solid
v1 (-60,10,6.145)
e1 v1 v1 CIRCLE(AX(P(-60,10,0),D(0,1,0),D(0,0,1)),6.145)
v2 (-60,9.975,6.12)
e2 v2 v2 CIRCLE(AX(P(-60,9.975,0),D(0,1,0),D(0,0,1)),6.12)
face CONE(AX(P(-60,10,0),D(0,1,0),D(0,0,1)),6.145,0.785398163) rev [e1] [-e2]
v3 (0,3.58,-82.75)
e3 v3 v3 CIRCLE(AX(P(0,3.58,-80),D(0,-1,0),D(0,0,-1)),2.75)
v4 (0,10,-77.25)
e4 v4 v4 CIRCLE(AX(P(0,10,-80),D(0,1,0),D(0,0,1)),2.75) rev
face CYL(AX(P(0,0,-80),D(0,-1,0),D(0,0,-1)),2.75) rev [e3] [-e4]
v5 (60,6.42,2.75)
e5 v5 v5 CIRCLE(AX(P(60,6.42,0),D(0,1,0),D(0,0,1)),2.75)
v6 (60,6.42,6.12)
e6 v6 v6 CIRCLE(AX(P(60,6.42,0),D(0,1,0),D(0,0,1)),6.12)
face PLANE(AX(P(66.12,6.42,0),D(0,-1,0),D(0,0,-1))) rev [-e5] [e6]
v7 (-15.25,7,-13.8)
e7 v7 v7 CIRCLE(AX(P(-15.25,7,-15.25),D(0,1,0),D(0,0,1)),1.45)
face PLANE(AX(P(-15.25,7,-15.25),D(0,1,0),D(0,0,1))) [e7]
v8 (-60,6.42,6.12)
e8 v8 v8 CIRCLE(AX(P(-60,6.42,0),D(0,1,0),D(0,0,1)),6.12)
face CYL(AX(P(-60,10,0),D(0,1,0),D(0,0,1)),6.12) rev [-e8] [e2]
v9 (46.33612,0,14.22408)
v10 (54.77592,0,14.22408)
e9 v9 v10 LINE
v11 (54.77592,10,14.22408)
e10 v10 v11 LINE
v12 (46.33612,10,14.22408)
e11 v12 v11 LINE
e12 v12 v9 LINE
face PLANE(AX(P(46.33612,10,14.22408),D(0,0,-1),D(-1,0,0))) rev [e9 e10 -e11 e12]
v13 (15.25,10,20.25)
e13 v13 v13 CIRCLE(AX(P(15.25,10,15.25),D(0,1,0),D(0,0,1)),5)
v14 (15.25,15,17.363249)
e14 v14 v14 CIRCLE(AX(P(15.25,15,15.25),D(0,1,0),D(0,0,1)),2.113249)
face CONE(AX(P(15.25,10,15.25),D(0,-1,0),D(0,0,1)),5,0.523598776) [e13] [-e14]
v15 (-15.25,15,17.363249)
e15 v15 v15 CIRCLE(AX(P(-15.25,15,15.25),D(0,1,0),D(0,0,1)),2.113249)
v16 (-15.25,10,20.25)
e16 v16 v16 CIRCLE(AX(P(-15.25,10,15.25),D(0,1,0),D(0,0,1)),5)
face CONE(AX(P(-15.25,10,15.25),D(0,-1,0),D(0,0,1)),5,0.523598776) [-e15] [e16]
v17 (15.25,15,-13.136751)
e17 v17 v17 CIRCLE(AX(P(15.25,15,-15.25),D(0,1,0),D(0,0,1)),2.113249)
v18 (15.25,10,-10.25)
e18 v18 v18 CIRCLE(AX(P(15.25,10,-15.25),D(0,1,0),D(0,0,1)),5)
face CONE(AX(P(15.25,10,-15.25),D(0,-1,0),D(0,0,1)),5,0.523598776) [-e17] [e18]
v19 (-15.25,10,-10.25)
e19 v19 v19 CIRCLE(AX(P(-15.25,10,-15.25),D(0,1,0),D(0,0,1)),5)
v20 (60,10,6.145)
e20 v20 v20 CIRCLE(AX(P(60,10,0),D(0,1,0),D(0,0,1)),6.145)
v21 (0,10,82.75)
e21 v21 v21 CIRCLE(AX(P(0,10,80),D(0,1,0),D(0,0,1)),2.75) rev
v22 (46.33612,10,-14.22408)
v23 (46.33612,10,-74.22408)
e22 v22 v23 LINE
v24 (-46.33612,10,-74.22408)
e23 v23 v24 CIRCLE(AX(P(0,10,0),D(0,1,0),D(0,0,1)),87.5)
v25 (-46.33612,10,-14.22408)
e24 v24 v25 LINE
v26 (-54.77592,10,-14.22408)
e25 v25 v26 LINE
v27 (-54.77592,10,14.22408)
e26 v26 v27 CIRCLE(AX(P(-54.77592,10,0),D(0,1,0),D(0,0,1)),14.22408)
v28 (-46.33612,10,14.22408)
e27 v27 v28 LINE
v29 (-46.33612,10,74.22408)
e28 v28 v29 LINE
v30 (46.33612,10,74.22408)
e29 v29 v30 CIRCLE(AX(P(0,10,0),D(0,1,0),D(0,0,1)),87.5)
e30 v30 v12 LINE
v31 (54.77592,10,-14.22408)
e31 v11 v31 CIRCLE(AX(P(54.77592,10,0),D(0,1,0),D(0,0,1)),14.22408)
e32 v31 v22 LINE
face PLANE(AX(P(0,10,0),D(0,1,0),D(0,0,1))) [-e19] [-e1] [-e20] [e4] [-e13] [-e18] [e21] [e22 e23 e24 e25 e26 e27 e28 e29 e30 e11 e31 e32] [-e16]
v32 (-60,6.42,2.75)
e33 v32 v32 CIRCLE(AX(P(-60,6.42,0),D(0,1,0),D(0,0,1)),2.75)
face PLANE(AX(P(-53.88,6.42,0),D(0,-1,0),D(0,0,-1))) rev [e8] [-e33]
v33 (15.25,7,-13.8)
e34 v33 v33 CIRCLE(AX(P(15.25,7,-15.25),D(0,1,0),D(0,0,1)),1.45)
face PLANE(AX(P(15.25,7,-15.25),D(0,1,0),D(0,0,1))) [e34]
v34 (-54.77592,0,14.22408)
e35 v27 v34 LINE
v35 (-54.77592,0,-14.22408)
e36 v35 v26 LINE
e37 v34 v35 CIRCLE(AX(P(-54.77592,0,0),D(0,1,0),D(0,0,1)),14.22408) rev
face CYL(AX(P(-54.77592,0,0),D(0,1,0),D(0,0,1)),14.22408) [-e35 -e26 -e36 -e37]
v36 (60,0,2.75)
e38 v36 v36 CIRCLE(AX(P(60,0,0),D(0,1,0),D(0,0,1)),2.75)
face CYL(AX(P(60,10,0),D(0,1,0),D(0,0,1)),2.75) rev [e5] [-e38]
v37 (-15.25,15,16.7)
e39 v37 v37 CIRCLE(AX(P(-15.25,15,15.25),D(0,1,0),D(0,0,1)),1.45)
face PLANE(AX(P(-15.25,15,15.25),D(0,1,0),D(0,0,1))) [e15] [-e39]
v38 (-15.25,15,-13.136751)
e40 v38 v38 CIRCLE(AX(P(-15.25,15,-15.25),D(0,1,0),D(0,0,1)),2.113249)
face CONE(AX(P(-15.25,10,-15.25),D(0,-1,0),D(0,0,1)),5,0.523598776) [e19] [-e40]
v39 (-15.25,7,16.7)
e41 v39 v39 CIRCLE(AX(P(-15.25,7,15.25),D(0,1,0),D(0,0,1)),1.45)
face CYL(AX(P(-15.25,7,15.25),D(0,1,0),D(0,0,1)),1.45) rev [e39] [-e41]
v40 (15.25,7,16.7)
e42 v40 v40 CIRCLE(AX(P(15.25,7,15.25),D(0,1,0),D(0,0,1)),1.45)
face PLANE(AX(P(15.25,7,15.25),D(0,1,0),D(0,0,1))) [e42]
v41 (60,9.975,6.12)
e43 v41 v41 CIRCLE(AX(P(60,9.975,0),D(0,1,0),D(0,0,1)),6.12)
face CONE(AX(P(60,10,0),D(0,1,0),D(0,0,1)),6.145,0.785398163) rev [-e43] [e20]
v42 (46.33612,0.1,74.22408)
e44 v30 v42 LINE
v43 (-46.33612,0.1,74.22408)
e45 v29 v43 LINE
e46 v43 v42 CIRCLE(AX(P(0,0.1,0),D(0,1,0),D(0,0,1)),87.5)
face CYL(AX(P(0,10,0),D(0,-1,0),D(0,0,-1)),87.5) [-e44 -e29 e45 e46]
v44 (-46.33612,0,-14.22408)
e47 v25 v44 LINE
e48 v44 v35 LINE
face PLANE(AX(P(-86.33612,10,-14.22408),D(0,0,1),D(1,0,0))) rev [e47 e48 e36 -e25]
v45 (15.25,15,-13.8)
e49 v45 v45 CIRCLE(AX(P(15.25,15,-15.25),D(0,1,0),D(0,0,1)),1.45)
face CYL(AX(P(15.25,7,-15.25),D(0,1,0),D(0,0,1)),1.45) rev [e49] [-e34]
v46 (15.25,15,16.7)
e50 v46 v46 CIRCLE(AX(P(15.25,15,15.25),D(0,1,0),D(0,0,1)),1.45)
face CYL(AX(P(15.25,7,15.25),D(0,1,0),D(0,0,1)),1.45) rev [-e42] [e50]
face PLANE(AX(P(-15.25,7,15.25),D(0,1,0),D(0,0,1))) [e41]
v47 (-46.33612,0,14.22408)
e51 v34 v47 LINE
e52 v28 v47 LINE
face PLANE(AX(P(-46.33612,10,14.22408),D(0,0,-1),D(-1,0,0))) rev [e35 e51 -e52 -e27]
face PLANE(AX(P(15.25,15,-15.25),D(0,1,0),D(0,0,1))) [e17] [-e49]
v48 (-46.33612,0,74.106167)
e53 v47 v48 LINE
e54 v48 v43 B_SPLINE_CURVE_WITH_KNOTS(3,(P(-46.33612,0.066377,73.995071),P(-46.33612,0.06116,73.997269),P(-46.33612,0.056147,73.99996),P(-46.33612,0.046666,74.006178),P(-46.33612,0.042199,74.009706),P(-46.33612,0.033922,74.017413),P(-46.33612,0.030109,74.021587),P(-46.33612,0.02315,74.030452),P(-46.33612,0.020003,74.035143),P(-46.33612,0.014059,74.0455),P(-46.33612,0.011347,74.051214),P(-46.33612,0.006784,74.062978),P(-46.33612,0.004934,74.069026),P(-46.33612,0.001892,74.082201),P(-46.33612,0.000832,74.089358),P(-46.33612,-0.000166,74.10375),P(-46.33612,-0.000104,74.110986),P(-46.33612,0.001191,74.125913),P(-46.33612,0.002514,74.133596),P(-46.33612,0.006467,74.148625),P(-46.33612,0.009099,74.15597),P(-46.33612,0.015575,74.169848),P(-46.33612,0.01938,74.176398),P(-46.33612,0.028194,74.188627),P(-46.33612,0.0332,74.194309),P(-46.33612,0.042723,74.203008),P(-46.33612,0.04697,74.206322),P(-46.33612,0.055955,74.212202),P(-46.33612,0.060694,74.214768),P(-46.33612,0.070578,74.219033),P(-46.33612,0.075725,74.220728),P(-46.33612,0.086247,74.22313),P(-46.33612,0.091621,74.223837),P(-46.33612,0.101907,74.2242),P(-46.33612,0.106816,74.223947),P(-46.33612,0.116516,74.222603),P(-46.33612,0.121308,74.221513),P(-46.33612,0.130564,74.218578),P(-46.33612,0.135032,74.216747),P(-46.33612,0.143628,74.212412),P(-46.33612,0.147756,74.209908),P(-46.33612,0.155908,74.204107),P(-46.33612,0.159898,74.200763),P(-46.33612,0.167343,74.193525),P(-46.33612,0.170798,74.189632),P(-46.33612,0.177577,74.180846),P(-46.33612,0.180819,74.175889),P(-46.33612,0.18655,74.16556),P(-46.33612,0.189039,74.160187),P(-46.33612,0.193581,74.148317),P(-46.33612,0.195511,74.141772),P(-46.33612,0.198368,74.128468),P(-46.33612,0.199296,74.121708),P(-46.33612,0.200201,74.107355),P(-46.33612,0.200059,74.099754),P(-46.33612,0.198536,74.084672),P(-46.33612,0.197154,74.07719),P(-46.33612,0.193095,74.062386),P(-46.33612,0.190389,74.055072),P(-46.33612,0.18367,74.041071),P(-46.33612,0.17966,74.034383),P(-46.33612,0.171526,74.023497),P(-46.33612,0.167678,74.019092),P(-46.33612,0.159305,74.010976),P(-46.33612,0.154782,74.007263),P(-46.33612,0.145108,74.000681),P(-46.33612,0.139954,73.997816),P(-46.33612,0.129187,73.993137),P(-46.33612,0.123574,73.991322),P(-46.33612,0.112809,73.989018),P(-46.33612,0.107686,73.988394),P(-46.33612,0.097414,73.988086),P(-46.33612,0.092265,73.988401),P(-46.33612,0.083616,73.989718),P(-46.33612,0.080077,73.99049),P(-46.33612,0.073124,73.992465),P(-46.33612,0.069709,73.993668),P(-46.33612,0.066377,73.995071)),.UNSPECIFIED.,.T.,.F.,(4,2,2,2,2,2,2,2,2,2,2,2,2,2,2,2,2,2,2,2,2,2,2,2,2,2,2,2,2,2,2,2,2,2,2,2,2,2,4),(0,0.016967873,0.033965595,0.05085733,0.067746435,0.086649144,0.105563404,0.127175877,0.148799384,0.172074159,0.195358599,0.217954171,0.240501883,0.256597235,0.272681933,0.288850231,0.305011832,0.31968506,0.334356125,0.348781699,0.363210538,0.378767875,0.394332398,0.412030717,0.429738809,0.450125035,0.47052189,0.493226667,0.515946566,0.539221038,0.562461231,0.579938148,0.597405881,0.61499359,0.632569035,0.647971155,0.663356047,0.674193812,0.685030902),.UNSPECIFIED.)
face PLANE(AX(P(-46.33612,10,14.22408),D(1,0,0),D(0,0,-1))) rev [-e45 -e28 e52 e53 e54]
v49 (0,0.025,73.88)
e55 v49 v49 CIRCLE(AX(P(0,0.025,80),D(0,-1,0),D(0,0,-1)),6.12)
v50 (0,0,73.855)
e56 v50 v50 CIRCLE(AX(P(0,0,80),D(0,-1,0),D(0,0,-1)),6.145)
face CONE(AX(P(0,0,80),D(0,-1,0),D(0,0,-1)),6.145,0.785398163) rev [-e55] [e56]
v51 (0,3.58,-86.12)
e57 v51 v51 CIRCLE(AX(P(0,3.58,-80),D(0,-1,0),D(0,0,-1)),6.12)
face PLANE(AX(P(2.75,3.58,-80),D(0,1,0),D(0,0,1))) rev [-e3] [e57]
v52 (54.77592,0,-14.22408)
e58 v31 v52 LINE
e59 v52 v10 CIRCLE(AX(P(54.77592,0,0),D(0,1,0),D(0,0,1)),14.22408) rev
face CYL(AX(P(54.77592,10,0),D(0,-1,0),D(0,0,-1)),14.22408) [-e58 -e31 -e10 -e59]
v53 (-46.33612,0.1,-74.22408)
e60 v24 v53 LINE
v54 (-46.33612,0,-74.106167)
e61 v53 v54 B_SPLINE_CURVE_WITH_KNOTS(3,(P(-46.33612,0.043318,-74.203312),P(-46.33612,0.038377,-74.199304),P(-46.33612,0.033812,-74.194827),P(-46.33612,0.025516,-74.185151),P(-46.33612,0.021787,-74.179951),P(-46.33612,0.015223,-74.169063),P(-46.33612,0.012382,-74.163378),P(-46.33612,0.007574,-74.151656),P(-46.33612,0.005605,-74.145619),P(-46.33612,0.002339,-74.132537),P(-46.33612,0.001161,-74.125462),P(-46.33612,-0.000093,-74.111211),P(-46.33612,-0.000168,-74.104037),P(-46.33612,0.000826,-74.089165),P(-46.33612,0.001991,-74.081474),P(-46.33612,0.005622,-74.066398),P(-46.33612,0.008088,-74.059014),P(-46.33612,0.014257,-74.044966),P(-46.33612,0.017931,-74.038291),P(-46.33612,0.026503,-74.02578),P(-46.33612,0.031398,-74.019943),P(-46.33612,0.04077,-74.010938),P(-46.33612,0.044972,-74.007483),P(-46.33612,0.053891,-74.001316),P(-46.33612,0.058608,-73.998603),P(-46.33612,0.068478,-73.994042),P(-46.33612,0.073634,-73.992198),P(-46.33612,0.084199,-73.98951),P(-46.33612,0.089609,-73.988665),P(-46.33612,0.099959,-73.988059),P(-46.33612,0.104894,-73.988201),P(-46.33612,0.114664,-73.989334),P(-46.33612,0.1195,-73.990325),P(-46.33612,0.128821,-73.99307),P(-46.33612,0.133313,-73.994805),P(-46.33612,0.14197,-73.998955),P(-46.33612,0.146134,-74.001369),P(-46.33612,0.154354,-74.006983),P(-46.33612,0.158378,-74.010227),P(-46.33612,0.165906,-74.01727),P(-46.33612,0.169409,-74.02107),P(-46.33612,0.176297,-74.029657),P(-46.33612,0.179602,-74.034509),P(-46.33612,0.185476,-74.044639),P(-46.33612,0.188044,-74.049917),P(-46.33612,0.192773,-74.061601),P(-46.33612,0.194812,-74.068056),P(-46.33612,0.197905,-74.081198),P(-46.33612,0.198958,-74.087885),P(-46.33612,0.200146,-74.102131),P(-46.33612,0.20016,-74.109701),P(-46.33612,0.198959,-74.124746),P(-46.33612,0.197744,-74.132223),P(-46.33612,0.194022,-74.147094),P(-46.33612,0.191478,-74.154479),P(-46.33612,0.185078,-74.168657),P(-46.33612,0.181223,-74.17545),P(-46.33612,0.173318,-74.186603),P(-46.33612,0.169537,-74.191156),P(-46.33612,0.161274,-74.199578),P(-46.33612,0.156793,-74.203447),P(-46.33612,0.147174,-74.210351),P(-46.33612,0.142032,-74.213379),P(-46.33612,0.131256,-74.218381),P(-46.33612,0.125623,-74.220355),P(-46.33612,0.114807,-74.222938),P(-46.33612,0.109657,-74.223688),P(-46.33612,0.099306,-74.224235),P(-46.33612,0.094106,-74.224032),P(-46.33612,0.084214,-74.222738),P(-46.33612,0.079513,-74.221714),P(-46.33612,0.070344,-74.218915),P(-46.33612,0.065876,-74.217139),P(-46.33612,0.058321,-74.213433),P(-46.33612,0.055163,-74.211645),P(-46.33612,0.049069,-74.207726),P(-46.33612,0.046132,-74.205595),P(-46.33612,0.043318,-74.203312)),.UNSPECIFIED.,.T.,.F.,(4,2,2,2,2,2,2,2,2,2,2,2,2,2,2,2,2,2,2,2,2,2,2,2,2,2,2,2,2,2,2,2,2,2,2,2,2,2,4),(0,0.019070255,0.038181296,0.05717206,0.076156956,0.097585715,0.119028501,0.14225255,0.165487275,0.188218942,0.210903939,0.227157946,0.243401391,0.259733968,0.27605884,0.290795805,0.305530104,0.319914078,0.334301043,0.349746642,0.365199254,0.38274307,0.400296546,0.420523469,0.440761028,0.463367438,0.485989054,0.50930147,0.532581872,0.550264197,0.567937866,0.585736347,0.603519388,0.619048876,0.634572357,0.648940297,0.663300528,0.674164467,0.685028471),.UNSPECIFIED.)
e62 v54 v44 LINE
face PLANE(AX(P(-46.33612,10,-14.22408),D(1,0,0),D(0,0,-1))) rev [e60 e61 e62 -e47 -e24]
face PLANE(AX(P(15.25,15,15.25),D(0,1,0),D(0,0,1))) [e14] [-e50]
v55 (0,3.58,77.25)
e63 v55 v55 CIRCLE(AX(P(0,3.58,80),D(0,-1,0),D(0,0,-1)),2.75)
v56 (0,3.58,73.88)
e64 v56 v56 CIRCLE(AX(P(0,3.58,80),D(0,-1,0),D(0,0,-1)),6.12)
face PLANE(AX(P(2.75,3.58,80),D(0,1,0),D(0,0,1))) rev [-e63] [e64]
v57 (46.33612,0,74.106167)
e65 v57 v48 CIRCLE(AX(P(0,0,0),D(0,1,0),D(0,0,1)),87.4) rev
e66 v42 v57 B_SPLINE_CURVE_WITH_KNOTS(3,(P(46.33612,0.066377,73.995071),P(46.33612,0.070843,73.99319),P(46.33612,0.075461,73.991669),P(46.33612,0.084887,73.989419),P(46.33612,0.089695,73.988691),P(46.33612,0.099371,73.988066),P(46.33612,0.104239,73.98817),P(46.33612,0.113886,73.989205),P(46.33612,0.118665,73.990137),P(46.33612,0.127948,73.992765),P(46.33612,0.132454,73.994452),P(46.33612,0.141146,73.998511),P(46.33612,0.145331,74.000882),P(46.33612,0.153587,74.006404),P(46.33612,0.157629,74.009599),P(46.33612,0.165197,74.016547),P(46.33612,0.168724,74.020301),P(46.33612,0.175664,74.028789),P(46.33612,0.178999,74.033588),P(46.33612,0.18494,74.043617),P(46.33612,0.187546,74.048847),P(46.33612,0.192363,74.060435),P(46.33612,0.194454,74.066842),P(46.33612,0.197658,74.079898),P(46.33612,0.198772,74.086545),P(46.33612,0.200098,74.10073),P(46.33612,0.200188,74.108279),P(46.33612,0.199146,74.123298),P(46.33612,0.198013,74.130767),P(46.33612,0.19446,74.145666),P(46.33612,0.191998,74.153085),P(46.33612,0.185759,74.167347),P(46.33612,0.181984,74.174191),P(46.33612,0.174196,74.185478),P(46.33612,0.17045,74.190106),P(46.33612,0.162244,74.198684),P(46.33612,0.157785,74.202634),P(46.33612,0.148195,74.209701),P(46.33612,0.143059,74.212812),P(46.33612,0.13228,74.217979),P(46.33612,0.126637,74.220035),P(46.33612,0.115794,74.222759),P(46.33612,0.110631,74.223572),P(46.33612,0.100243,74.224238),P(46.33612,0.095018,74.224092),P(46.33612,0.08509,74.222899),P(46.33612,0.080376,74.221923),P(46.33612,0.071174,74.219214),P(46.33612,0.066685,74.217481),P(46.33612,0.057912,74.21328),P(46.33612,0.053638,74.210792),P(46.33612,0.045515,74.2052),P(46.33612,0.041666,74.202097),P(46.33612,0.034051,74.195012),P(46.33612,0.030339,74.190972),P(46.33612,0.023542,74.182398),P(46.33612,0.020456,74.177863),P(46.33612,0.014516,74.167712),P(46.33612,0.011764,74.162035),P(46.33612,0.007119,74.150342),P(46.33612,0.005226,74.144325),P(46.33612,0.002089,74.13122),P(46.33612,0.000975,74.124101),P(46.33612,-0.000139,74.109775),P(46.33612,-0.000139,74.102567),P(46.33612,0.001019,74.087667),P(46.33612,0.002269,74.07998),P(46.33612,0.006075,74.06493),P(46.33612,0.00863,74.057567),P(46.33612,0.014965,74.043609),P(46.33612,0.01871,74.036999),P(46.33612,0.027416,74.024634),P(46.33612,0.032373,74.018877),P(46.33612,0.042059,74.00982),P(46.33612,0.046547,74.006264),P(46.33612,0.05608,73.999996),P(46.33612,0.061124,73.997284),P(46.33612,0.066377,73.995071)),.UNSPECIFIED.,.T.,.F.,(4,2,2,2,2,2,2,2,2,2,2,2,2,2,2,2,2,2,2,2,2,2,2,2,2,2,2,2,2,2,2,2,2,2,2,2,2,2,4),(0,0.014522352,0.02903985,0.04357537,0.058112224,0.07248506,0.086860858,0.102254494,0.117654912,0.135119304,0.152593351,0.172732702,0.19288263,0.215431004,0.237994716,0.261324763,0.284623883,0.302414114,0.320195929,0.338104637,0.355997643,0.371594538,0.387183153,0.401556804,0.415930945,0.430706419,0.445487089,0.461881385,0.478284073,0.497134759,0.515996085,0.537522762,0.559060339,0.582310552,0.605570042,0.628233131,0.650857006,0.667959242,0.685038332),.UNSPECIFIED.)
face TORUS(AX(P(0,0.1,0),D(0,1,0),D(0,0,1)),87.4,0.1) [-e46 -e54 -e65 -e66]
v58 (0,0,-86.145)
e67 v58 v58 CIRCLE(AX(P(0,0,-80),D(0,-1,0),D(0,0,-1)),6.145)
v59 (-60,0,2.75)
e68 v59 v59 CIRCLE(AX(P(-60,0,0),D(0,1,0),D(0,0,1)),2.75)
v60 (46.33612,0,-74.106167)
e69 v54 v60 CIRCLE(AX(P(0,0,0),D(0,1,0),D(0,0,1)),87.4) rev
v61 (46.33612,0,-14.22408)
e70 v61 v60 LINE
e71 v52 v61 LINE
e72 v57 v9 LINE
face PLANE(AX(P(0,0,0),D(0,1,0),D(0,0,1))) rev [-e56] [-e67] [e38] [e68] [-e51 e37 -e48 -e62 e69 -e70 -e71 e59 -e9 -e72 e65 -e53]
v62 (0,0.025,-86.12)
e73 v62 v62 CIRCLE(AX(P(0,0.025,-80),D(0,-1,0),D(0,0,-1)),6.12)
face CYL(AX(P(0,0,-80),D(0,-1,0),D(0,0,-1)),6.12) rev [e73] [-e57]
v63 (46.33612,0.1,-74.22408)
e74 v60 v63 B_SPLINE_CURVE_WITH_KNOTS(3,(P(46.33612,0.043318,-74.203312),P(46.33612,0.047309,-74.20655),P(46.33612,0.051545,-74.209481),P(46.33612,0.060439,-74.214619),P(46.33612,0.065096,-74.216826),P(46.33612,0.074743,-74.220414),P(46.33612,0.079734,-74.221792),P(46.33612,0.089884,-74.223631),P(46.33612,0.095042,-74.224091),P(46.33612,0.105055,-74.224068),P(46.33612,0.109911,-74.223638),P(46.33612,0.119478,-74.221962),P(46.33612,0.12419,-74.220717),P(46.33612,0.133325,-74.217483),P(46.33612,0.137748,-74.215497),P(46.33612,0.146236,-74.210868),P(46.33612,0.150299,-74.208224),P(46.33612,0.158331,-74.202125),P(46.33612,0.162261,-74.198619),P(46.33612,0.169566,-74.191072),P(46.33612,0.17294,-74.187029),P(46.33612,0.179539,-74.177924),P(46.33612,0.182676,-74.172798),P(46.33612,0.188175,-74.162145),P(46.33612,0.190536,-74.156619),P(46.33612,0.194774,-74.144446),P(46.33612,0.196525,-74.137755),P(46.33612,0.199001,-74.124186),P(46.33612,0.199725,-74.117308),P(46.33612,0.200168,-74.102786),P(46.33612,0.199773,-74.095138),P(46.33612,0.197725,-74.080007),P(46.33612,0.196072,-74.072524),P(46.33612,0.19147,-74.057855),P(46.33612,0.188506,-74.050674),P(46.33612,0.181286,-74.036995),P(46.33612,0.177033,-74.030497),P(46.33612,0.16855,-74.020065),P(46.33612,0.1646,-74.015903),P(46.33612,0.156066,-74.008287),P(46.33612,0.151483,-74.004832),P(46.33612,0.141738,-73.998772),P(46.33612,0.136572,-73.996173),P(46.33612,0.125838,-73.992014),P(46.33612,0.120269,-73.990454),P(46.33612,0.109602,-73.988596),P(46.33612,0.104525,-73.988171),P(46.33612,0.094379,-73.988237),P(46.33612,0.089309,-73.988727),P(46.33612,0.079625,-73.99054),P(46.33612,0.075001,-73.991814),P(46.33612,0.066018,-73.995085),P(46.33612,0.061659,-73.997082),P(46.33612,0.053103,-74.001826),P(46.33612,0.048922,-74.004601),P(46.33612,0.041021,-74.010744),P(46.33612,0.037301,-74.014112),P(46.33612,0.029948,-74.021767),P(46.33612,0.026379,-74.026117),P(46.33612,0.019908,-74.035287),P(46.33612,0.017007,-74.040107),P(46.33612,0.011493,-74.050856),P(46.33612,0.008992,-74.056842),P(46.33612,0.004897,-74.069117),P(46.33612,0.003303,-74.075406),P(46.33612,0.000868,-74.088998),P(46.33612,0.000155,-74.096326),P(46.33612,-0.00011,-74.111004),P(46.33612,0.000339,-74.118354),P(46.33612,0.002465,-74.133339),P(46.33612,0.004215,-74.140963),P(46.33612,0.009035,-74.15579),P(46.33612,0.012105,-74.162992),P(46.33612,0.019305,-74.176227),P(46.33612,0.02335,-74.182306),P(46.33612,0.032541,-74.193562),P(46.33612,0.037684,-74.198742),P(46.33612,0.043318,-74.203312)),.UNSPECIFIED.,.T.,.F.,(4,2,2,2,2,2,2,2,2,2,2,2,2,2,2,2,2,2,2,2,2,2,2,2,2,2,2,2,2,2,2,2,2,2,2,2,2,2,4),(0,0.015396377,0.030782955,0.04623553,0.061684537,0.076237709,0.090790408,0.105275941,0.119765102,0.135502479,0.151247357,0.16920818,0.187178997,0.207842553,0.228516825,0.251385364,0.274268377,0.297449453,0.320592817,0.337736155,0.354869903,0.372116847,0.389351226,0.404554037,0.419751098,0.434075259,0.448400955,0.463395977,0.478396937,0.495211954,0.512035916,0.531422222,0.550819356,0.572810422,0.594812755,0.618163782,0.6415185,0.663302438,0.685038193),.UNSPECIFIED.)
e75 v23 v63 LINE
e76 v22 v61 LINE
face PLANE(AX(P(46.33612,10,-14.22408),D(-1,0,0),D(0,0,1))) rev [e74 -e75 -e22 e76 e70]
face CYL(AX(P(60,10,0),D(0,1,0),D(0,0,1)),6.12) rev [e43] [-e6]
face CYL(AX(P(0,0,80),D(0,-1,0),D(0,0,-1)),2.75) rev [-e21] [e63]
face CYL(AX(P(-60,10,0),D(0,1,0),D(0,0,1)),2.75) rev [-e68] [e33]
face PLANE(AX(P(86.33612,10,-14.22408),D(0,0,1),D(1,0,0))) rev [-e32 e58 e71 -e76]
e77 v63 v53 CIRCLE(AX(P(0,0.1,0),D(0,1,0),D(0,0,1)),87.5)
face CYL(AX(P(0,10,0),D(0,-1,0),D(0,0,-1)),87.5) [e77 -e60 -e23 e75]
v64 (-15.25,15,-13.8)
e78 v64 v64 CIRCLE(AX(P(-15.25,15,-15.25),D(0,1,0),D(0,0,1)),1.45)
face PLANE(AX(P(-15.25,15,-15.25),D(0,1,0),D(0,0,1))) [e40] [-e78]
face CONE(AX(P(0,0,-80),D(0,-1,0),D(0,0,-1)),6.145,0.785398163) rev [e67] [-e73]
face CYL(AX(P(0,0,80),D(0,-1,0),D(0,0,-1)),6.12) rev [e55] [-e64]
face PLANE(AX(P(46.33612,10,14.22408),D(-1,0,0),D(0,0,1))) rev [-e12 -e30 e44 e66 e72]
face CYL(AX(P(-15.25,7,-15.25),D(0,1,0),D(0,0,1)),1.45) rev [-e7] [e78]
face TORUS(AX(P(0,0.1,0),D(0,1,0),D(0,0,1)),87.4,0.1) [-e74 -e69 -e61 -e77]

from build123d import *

# Parameters (mm, degrees)
SKETCH1_R                              = 87.5
BOSS_EXTRUDE1_DEPTH                    = 10
SKETCH2_R                              = 7.5
BOSS_EXTRUDE2_DEPTH                    = 80
CBORE_FOR_M5_HEX_HEAD_BOLT1_AT_2_COUNT = 2
CBORE_FOR_M5_HEX_HEAD_BOLT1_AT_2_PITCH = 113.13708499
CBORE_FOR_M5_HEX_HEAD_BOLT1_AT_3_COUNT = 2
CBORE_FOR_M5_HEX_HEAD_BOLT1_AT_3_PITCH = 160
CBORE_FOR_M5_HEX_HEAD_BOLT1_AT_4_COUNT = 2
CBORE_FOR_M5_HEX_HEAD_BOLT1_AT_4_PITCH = 113.13708499
SKETCH5_R                              = 87.5
CUT_EXTRUDE1_DEPTH                     = 80
FILLET1_R                              = 0.1
SKETCH6_R                              = 5
BOSS_EXTRUDE3_DEPTH                    = 5
BOSS_EXTRUDE3_DRAFT                    = 30
BOSS_EXTRUDE3_PROFILE_2_DEPTH          = 5
BOSS_EXTRUDE3_PROFILE_2_DRAFT          = 30
BOSS_EXTRUDE3_PROFILE_3_DEPTH          = 5
BOSS_EXTRUDE3_PROFILE_3_DRAFT          = 30
BOSS_EXTRUDE3_PROFILE_4_DEPTH          = 5
BOSS_EXTRUDE3_PROFILE_4_DRAFT          = 30
SKETCH7_R                              = 1.45
CUT_EXTRUDE2_DEPTH                     = 8
CUT_EXTRUDE5_DEPTH                     = 10
CBORE_FOR_M5_HEX_HEAD_BOLT2_AT_2_COUNT = 2
CBORE_FOR_M5_HEX_HEAD_BOLT2_AT_2_PITCH = 120
SKETCH14_R                             = 2.75
CUT_EXTRUDE6_DEPTH                     = 70
FILLET2_RADIUS                         = 14.224079762
FILLET2_LENGTH                         = 10
FILLET3_RADIUS                         = 14.224079762
FILLET3_LENGTH                         = 10


with BuildPart() as part:
    # Sketch1 → Boss-Extrude1 (new body)
    with BuildSketch(Plane(origin=(0, 0, 0), x_dir=(1, 0, 0), z_dir=(0, 1, 0))):
        with Locations(Location((0, 0, 0), (0, 0, 270))):
            Circle(SKETCH1_R)
    extrude(amount=BOSS_EXTRUDE1_DEPTH)

    # Sketch2 → Boss-Extrude2 (add)
    with BuildSketch(Plane(origin=(0, 10, 0), x_dir=(1, 0, 0), z_dir=(0, 1, 0))):
        with Locations(Location((0, -80, 0), (0, 0, 269.999690569))):
            Circle(SKETCH2_R)
        with Locations(Location((-80, 0, 0), (0, 0, 179.999690555))):
            Circle(SKETCH2_R)
        with Locations(Location((0, 80, 0), (0, 0, 89.999690569))):
            Circle(SKETCH2_R)
        with Locations(Location((80, 0, 0), (0, 0, 359.999690555))):
            Circle(SKETCH2_R)
    extrude(amount=BOSS_EXTRUDE2_DEPTH)

    # Sketch4 → CBORE for M5 Hex Head Bolt1 (revolve, cut)
    with BuildSketch(Plane(origin=(80, 0, 0), x_dir=(0, 0, -1), z_dir=(1, 0, 0))):
        Polygon((0, 0), (0, 21.652366702), (2.75, 20), (2.75, 3.58), (6.12, 3.58), (6.12, 0.025), (6.145, 0), align=None)
    cbore_for_m5_hex_head_bolt1 = revolve(axis=Axis((80, -6.35, 0), (0, 1, 0)), mode=Mode.SUBTRACT)

    # CBORE for M5 Hex Head Bolt1 at 2: CBORE for M5 Hex Head Bolt1 ×2
    with Locations(*[Vector(-0.7071067811865476, 0, -0.7071067811865476) * (i * CBORE_FOR_M5_HEX_HEAD_BOLT1_AT_2_PITCH) for i in range(1, CBORE_FOR_M5_HEX_HEAD_BOLT1_AT_2_COUNT)]):
        add(cbore_for_m5_hex_head_bolt1, mode=Mode.SUBTRACT)

    # CBORE for M5 Hex Head Bolt1 at 3: CBORE for M5 Hex Head Bolt1 ×2
    with Locations(*[(-i * CBORE_FOR_M5_HEX_HEAD_BOLT1_AT_3_PITCH, 0, 0) for i in range(1, CBORE_FOR_M5_HEX_HEAD_BOLT1_AT_3_COUNT)]):
        add(cbore_for_m5_hex_head_bolt1, mode=Mode.SUBTRACT)

    # CBORE for M5 Hex Head Bolt1 at 4: CBORE for M5 Hex Head Bolt1 ×2
    with Locations(*[Vector(-0.7071067811865476, 0, 0.7071067811865476) * (i * CBORE_FOR_M5_HEX_HEAD_BOLT1_AT_4_PITCH) for i in range(1, CBORE_FOR_M5_HEX_HEAD_BOLT1_AT_4_COUNT)]):
        add(cbore_for_m5_hex_head_bolt1, mode=Mode.SUBTRACT)

    # Sketch5 → Cut-Extrude1 (cut)
    with BuildSketch(Plane(origin=(0, 10, 0), x_dir=(1, 0, 0), z_dir=(0, 1, 0))):
        with Locations(Location((0, 0, 0), (0, 0, 270))):
            Circle(SKETCH5_R)
    extrude(amount=CUT_EXTRUDE1_DEPTH, mode=Mode.SUBTRACT)


with BuildPart() as cut_extrude1_kept_piece:
    # of the separate pieces the step leaves, the one the design keeps (cut_extrude1_pieces_kept)
    add(part.part.solids().sort_by_distance((0, 0, 87.5))[0])

    # Fillet1
    fillet1_2_edges = [cut_extrude1_kept_piece.edges().sort_by_distance(p)[0] for p in [
        (0, 0, -87.5),
    ]]
    fillet(fillet1_2_edges, radius=FILLET1_R)


with BuildPart() as boss_extrude3_tool:
    # Sketch6 → Boss-Extrude3 (with draft: the straight prism first)
    with BuildSketch(Plane(origin=(0, 10, 0), x_dir=(1, 0, 0), z_dir=(0, 1, 0))):
        with Locations((-15.25, 15.25)):
            Circle(SKETCH6_R)
    extrude(amount=BOSS_EXTRUDE3_DEPTH)
    # Boss-Extrude3: the draft: its side faces are tilted about the plane it starts from
    boss_extrude3_sides = [boss_extrude3_tool.faces().sort_by_distance(p)[0] for p in [
        (-20.25, 12.5, -15.25),
    ]]
    draft(boss_extrude3_sides, Plane(origin=(0, 10, 0), x_dir=(1, 0, 0), z_dir=(0, 1, 0)), BOSS_EXTRUDE3_DRAFT)


with BuildPart() as cut_extrude1_kept_piece_1:
    add(cut_extrude1_kept_piece.part)

    # Boss-Extrude3: add boss_extrude3_tool
    add(boss_extrude3_tool.part)


with BuildPart() as boss_extrude3_profile_2_tool:
    # Sketch6 → Boss-Extrude3 profile 2 (with draft: the straight prism first)
    with BuildSketch(Plane(origin=(0, 10, 0), x_dir=(1, 0, 0), z_dir=(0, 1, 0))):
        with Locations((15.25, 15.25)):
            Circle(SKETCH6_R)
    extrude(amount=BOSS_EXTRUDE3_PROFILE_2_DEPTH)
    # Boss-Extrude3 profile 2: the draft: its side faces are tilted about the plane it starts from
    boss_extrude3_profile_2_sides = [boss_extrude3_profile_2_tool.faces().sort_by_distance(p)[0] for p in [
        (10.25, 12.5, -15.25),
    ]]
    draft(boss_extrude3_profile_2_sides, Plane(origin=(0, 10, 0), x_dir=(1, 0, 0), z_dir=(0, 1, 0)), BOSS_EXTRUDE3_PROFILE_2_DRAFT)


with BuildPart() as cut_extrude1_kept_piece_2:
    add(cut_extrude1_kept_piece_1.part)

    # Boss-Extrude3 profile 2: add boss_extrude3_profile_2_tool
    add(boss_extrude3_profile_2_tool.part)


with BuildPart() as boss_extrude3_profile_3_tool:
    # Sketch6 → Boss-Extrude3 profile 3 (with draft: the straight prism first)
    with BuildSketch(Plane(origin=(0, 10, 0), x_dir=(1, 0, 0), z_dir=(0, 1, 0))):
        with Locations((15.25, -15.25)):
            Circle(SKETCH6_R)
    extrude(amount=BOSS_EXTRUDE3_PROFILE_3_DEPTH)
    # Boss-Extrude3 profile 3: the draft: its side faces are tilted about the plane it starts from
    boss_extrude3_profile_3_sides = [boss_extrude3_profile_3_tool.faces().sort_by_distance(p)[0] for p in [
        (10.25, 12.5, 15.25),
    ]]
    draft(boss_extrude3_profile_3_sides, Plane(origin=(0, 10, 0), x_dir=(1, 0, 0), z_dir=(0, 1, 0)), BOSS_EXTRUDE3_PROFILE_3_DRAFT)


with BuildPart() as cut_extrude1_kept_piece_3:
    add(cut_extrude1_kept_piece_2.part)

    # Boss-Extrude3 profile 3: add boss_extrude3_profile_3_tool
    add(boss_extrude3_profile_3_tool.part)


with BuildPart() as boss_extrude3_profile_4_tool:
    # Sketch6 → Boss-Extrude3 profile 4 (with draft: the straight prism first)
    with BuildSketch(Plane(origin=(0, 10, 0), x_dir=(1, 0, 0), z_dir=(0, 1, 0))):
        with Locations((-15.25, -15.25)):
            Circle(SKETCH6_R)
    extrude(amount=BOSS_EXTRUDE3_PROFILE_4_DEPTH)
    # Boss-Extrude3 profile 4: the draft: its side faces are tilted about the plane it starts from
    boss_extrude3_profile_4_sides = [boss_extrude3_profile_4_tool.faces().sort_by_distance(p)[0] for p in [
        (-20.25, 12.5, 15.25),
    ]]
    draft(boss_extrude3_profile_4_sides, Plane(origin=(0, 10, 0), x_dir=(1, 0, 0), z_dir=(0, 1, 0)), BOSS_EXTRUDE3_PROFILE_4_DRAFT)


with BuildPart() as cut_extrude1_kept_piece_4:
    add(cut_extrude1_kept_piece_3.part)

    # Boss-Extrude3 profile 4: add boss_extrude3_profile_4_tool
    add(boss_extrude3_profile_4_tool.part)

    # Sketch7 → Cut-Extrude2 (cut)
    with BuildSketch(Plane(origin=(0, 15, 0), x_dir=(1, 0, 0), z_dir=(0, 1, 0))):
        with Locations(Location((-15.25, 15.25, 0), (0, 0, 270))):
            Circle(SKETCH7_R)
        with Locations(Location((15.25, 15.25, 0), (0, 0, 270))):
            Circle(SKETCH7_R)
        with Locations(Location((15.25, -15.25, 0), (0, 0, 270))):
            Circle(SKETCH7_R)
        with Locations(Location((-15.25, -15.25, 0), (0, 0, 270))):
            Circle(SKETCH7_R)
    extrude(amount=-CUT_EXTRUDE2_DEPTH, mode=Mode.SUBTRACT)

    # Sketch10 → Cut-Extrude5 (cut)
    with BuildSketch(Plane.XZ):
        with BuildLine():
            Line((-86.336119643, -14.224079762), (-46.336119643, -14.224079762))
            Line((-46.336119643, -14.224079762), (-46.336119643, -74.224079762))
            ThreePointArc((-46.336119643, -74.224079762), (-72.804400755, -48.53626717), (-86.336119643, -14.224079762))
        make_face()
        with BuildLine():
            Line((-46.336119643, 14.224079762), (-46.336119643, 74.224079762))
            ThreePointArc((-46.336119643, 74.224079762), (-72.804400755, 48.53626717), (-86.336119643, 14.224079762))
            Line((-86.336119643, 14.224079762), (-46.336119643, 14.224079762))
        make_face()
        with BuildLine():
            Line((46.336119643, 14.224079762), (86.336119643, 14.224079762))
            ThreePointArc((86.336119643, 14.224079762), (72.804400755, 48.53626717), (46.336119643, 74.224079762))
            Line((46.336119643, 74.224079762), (46.336119643, 14.224079762))
        make_face()
        with BuildLine():
            Line((46.336119643, -14.224079762), (46.336119643, -74.224079762))
            ThreePointArc((46.336119643, -74.224079762), (72.804400755, -48.53626717), (86.336119643, -14.224079762))
            Line((86.336119643, -14.224079762), (46.336119643, -14.224079762))
        make_face()
    extrude(amount=-CUT_EXTRUDE5_DEPTH, mode=Mode.SUBTRACT)

    # Sketch13 → CBORE for M5 Hex Head Bolt2 (revolve, cut)
    with BuildSketch(Plane(origin=(-60, 10, 0), x_dir=(0, 0, 1), z_dir=(1, 0, 0))):
        Polygon((0, 0), (0, 10), (2.75, 10), (2.75, 3.58), (6.12, 3.58), (6.12, 0.025), (6.145, 0), align=None)
    cbore_for_m5_hex_head_bolt2 = revolve(axis=Axis((-60, 16.35, 0), (0, -1, 0)), mode=Mode.SUBTRACT)

    # CBORE for M5 Hex Head Bolt2 at 2: CBORE for M5 Hex Head Bolt2 ×2
    with Locations(*[(i * CBORE_FOR_M5_HEX_HEAD_BOLT2_AT_2_PITCH, 0, 0) for i in range(1, CBORE_FOR_M5_HEX_HEAD_BOLT2_AT_2_COUNT)]):
        add(cbore_for_m5_hex_head_bolt2, mode=Mode.SUBTRACT)

    # Sketch14 → Cut-Extrude6 (cut)
    # profile 1 of 2: a face of its own
    with BuildSketch(Plane(origin=(0, 10, 0), x_dir=(1, 0, 0), z_dir=(0, 1, 0))):
        with BuildLine():
            Line((-69, -14.224079762), (-69, 14.224079762))
            Line((-69, 14.224079762), (-86.336119643, 14.224079762))
            ThreePointArc((-86.336119643, 14.224079762), (-87.5, 0), (-86.336119643, -14.224079762))
            Line((-86.336119643, -14.224079762), (-69, -14.224079762))
        make_face()
        with Locations((-80, 0)):
            Circle(SKETCH14_R, mode=Mode.SUBTRACT)
    # profile 2 of 2: a face of its own
    with BuildSketch(Plane(origin=(0, 10, 0), x_dir=(1, 0, 0), z_dir=(0, 1, 0))):
        with BuildLine():
            Line((86.336119643, 14.224079762), (69, 14.224079762))
            Line((69, 14.224079762), (69, -14.224079762))
            Line((69, -14.224079762), (86.336119643, -14.224079762))
            ThreePointArc((86.336119643, -14.224079762), (87.5, 0), (86.336119643, 14.224079762))
        make_face()
        with Locations((80, 0)):
            Circle(SKETCH14_R, mode=Mode.SUBTRACT)
    extrude(amount=-CUT_EXTRUDE6_DEPTH, mode=Mode.SUBTRACT)

    # Fillet2: full round fillet: the end face becomes a half cylinder, R = half its width
    fillet2_face = Plane((-69, 5, 0), x_dir=(0, 1, 0), z_dir=(-1, 0, 0))  # on the end face: x along it, z out of the body
    fillet2_slab = fillet2_face.offset(-FILLET2_RADIUS / 2) * Box(FILLET2_LENGTH, 2 * FILLET2_RADIUS, FILLET2_RADIUS, mode=Mode.PRIVATE)  # the body's end, R deep
    fillet2_round = Plane((-54.775920238, 5, 0), x_dir=(-1, 0, 0), z_dir=(0, 1, 0)) * Cylinder(FILLET2_RADIUS, FILLET2_LENGTH, mode=Mode.PRIVATE)  # its axis R under the face
    add(fillet2_slab - fillet2_round, mode=Mode.SUBTRACT)

    # Fillet3: full round fillet: the end face becomes a half cylinder, R = half its width
    fillet3_face = Plane((69, 5, 0), x_dir=(0, 1, 0), z_dir=(1, 0, 0))  # on the end face: x along it, z out of the body
    fillet3_slab = fillet3_face.offset(-FILLET3_RADIUS / 2) * Box(FILLET3_LENGTH, 2 * FILLET3_RADIUS, FILLET3_RADIUS, mode=Mode.PRIVATE)  # the body's end, R deep
    fillet3_round = Plane((54.775920238, 5, 0), x_dir=(1, 0, 0), z_dir=(0, 1, 0)) * Cylinder(FILLET3_RADIUS, FILLET3_LENGTH, mode=Mode.PRIVATE)  # its axis R under the face
    add(fillet3_slab - fillet3_round, mode=Mode.SUBTRACT)


solid = cut_extrude1_kept_piece_4.part
